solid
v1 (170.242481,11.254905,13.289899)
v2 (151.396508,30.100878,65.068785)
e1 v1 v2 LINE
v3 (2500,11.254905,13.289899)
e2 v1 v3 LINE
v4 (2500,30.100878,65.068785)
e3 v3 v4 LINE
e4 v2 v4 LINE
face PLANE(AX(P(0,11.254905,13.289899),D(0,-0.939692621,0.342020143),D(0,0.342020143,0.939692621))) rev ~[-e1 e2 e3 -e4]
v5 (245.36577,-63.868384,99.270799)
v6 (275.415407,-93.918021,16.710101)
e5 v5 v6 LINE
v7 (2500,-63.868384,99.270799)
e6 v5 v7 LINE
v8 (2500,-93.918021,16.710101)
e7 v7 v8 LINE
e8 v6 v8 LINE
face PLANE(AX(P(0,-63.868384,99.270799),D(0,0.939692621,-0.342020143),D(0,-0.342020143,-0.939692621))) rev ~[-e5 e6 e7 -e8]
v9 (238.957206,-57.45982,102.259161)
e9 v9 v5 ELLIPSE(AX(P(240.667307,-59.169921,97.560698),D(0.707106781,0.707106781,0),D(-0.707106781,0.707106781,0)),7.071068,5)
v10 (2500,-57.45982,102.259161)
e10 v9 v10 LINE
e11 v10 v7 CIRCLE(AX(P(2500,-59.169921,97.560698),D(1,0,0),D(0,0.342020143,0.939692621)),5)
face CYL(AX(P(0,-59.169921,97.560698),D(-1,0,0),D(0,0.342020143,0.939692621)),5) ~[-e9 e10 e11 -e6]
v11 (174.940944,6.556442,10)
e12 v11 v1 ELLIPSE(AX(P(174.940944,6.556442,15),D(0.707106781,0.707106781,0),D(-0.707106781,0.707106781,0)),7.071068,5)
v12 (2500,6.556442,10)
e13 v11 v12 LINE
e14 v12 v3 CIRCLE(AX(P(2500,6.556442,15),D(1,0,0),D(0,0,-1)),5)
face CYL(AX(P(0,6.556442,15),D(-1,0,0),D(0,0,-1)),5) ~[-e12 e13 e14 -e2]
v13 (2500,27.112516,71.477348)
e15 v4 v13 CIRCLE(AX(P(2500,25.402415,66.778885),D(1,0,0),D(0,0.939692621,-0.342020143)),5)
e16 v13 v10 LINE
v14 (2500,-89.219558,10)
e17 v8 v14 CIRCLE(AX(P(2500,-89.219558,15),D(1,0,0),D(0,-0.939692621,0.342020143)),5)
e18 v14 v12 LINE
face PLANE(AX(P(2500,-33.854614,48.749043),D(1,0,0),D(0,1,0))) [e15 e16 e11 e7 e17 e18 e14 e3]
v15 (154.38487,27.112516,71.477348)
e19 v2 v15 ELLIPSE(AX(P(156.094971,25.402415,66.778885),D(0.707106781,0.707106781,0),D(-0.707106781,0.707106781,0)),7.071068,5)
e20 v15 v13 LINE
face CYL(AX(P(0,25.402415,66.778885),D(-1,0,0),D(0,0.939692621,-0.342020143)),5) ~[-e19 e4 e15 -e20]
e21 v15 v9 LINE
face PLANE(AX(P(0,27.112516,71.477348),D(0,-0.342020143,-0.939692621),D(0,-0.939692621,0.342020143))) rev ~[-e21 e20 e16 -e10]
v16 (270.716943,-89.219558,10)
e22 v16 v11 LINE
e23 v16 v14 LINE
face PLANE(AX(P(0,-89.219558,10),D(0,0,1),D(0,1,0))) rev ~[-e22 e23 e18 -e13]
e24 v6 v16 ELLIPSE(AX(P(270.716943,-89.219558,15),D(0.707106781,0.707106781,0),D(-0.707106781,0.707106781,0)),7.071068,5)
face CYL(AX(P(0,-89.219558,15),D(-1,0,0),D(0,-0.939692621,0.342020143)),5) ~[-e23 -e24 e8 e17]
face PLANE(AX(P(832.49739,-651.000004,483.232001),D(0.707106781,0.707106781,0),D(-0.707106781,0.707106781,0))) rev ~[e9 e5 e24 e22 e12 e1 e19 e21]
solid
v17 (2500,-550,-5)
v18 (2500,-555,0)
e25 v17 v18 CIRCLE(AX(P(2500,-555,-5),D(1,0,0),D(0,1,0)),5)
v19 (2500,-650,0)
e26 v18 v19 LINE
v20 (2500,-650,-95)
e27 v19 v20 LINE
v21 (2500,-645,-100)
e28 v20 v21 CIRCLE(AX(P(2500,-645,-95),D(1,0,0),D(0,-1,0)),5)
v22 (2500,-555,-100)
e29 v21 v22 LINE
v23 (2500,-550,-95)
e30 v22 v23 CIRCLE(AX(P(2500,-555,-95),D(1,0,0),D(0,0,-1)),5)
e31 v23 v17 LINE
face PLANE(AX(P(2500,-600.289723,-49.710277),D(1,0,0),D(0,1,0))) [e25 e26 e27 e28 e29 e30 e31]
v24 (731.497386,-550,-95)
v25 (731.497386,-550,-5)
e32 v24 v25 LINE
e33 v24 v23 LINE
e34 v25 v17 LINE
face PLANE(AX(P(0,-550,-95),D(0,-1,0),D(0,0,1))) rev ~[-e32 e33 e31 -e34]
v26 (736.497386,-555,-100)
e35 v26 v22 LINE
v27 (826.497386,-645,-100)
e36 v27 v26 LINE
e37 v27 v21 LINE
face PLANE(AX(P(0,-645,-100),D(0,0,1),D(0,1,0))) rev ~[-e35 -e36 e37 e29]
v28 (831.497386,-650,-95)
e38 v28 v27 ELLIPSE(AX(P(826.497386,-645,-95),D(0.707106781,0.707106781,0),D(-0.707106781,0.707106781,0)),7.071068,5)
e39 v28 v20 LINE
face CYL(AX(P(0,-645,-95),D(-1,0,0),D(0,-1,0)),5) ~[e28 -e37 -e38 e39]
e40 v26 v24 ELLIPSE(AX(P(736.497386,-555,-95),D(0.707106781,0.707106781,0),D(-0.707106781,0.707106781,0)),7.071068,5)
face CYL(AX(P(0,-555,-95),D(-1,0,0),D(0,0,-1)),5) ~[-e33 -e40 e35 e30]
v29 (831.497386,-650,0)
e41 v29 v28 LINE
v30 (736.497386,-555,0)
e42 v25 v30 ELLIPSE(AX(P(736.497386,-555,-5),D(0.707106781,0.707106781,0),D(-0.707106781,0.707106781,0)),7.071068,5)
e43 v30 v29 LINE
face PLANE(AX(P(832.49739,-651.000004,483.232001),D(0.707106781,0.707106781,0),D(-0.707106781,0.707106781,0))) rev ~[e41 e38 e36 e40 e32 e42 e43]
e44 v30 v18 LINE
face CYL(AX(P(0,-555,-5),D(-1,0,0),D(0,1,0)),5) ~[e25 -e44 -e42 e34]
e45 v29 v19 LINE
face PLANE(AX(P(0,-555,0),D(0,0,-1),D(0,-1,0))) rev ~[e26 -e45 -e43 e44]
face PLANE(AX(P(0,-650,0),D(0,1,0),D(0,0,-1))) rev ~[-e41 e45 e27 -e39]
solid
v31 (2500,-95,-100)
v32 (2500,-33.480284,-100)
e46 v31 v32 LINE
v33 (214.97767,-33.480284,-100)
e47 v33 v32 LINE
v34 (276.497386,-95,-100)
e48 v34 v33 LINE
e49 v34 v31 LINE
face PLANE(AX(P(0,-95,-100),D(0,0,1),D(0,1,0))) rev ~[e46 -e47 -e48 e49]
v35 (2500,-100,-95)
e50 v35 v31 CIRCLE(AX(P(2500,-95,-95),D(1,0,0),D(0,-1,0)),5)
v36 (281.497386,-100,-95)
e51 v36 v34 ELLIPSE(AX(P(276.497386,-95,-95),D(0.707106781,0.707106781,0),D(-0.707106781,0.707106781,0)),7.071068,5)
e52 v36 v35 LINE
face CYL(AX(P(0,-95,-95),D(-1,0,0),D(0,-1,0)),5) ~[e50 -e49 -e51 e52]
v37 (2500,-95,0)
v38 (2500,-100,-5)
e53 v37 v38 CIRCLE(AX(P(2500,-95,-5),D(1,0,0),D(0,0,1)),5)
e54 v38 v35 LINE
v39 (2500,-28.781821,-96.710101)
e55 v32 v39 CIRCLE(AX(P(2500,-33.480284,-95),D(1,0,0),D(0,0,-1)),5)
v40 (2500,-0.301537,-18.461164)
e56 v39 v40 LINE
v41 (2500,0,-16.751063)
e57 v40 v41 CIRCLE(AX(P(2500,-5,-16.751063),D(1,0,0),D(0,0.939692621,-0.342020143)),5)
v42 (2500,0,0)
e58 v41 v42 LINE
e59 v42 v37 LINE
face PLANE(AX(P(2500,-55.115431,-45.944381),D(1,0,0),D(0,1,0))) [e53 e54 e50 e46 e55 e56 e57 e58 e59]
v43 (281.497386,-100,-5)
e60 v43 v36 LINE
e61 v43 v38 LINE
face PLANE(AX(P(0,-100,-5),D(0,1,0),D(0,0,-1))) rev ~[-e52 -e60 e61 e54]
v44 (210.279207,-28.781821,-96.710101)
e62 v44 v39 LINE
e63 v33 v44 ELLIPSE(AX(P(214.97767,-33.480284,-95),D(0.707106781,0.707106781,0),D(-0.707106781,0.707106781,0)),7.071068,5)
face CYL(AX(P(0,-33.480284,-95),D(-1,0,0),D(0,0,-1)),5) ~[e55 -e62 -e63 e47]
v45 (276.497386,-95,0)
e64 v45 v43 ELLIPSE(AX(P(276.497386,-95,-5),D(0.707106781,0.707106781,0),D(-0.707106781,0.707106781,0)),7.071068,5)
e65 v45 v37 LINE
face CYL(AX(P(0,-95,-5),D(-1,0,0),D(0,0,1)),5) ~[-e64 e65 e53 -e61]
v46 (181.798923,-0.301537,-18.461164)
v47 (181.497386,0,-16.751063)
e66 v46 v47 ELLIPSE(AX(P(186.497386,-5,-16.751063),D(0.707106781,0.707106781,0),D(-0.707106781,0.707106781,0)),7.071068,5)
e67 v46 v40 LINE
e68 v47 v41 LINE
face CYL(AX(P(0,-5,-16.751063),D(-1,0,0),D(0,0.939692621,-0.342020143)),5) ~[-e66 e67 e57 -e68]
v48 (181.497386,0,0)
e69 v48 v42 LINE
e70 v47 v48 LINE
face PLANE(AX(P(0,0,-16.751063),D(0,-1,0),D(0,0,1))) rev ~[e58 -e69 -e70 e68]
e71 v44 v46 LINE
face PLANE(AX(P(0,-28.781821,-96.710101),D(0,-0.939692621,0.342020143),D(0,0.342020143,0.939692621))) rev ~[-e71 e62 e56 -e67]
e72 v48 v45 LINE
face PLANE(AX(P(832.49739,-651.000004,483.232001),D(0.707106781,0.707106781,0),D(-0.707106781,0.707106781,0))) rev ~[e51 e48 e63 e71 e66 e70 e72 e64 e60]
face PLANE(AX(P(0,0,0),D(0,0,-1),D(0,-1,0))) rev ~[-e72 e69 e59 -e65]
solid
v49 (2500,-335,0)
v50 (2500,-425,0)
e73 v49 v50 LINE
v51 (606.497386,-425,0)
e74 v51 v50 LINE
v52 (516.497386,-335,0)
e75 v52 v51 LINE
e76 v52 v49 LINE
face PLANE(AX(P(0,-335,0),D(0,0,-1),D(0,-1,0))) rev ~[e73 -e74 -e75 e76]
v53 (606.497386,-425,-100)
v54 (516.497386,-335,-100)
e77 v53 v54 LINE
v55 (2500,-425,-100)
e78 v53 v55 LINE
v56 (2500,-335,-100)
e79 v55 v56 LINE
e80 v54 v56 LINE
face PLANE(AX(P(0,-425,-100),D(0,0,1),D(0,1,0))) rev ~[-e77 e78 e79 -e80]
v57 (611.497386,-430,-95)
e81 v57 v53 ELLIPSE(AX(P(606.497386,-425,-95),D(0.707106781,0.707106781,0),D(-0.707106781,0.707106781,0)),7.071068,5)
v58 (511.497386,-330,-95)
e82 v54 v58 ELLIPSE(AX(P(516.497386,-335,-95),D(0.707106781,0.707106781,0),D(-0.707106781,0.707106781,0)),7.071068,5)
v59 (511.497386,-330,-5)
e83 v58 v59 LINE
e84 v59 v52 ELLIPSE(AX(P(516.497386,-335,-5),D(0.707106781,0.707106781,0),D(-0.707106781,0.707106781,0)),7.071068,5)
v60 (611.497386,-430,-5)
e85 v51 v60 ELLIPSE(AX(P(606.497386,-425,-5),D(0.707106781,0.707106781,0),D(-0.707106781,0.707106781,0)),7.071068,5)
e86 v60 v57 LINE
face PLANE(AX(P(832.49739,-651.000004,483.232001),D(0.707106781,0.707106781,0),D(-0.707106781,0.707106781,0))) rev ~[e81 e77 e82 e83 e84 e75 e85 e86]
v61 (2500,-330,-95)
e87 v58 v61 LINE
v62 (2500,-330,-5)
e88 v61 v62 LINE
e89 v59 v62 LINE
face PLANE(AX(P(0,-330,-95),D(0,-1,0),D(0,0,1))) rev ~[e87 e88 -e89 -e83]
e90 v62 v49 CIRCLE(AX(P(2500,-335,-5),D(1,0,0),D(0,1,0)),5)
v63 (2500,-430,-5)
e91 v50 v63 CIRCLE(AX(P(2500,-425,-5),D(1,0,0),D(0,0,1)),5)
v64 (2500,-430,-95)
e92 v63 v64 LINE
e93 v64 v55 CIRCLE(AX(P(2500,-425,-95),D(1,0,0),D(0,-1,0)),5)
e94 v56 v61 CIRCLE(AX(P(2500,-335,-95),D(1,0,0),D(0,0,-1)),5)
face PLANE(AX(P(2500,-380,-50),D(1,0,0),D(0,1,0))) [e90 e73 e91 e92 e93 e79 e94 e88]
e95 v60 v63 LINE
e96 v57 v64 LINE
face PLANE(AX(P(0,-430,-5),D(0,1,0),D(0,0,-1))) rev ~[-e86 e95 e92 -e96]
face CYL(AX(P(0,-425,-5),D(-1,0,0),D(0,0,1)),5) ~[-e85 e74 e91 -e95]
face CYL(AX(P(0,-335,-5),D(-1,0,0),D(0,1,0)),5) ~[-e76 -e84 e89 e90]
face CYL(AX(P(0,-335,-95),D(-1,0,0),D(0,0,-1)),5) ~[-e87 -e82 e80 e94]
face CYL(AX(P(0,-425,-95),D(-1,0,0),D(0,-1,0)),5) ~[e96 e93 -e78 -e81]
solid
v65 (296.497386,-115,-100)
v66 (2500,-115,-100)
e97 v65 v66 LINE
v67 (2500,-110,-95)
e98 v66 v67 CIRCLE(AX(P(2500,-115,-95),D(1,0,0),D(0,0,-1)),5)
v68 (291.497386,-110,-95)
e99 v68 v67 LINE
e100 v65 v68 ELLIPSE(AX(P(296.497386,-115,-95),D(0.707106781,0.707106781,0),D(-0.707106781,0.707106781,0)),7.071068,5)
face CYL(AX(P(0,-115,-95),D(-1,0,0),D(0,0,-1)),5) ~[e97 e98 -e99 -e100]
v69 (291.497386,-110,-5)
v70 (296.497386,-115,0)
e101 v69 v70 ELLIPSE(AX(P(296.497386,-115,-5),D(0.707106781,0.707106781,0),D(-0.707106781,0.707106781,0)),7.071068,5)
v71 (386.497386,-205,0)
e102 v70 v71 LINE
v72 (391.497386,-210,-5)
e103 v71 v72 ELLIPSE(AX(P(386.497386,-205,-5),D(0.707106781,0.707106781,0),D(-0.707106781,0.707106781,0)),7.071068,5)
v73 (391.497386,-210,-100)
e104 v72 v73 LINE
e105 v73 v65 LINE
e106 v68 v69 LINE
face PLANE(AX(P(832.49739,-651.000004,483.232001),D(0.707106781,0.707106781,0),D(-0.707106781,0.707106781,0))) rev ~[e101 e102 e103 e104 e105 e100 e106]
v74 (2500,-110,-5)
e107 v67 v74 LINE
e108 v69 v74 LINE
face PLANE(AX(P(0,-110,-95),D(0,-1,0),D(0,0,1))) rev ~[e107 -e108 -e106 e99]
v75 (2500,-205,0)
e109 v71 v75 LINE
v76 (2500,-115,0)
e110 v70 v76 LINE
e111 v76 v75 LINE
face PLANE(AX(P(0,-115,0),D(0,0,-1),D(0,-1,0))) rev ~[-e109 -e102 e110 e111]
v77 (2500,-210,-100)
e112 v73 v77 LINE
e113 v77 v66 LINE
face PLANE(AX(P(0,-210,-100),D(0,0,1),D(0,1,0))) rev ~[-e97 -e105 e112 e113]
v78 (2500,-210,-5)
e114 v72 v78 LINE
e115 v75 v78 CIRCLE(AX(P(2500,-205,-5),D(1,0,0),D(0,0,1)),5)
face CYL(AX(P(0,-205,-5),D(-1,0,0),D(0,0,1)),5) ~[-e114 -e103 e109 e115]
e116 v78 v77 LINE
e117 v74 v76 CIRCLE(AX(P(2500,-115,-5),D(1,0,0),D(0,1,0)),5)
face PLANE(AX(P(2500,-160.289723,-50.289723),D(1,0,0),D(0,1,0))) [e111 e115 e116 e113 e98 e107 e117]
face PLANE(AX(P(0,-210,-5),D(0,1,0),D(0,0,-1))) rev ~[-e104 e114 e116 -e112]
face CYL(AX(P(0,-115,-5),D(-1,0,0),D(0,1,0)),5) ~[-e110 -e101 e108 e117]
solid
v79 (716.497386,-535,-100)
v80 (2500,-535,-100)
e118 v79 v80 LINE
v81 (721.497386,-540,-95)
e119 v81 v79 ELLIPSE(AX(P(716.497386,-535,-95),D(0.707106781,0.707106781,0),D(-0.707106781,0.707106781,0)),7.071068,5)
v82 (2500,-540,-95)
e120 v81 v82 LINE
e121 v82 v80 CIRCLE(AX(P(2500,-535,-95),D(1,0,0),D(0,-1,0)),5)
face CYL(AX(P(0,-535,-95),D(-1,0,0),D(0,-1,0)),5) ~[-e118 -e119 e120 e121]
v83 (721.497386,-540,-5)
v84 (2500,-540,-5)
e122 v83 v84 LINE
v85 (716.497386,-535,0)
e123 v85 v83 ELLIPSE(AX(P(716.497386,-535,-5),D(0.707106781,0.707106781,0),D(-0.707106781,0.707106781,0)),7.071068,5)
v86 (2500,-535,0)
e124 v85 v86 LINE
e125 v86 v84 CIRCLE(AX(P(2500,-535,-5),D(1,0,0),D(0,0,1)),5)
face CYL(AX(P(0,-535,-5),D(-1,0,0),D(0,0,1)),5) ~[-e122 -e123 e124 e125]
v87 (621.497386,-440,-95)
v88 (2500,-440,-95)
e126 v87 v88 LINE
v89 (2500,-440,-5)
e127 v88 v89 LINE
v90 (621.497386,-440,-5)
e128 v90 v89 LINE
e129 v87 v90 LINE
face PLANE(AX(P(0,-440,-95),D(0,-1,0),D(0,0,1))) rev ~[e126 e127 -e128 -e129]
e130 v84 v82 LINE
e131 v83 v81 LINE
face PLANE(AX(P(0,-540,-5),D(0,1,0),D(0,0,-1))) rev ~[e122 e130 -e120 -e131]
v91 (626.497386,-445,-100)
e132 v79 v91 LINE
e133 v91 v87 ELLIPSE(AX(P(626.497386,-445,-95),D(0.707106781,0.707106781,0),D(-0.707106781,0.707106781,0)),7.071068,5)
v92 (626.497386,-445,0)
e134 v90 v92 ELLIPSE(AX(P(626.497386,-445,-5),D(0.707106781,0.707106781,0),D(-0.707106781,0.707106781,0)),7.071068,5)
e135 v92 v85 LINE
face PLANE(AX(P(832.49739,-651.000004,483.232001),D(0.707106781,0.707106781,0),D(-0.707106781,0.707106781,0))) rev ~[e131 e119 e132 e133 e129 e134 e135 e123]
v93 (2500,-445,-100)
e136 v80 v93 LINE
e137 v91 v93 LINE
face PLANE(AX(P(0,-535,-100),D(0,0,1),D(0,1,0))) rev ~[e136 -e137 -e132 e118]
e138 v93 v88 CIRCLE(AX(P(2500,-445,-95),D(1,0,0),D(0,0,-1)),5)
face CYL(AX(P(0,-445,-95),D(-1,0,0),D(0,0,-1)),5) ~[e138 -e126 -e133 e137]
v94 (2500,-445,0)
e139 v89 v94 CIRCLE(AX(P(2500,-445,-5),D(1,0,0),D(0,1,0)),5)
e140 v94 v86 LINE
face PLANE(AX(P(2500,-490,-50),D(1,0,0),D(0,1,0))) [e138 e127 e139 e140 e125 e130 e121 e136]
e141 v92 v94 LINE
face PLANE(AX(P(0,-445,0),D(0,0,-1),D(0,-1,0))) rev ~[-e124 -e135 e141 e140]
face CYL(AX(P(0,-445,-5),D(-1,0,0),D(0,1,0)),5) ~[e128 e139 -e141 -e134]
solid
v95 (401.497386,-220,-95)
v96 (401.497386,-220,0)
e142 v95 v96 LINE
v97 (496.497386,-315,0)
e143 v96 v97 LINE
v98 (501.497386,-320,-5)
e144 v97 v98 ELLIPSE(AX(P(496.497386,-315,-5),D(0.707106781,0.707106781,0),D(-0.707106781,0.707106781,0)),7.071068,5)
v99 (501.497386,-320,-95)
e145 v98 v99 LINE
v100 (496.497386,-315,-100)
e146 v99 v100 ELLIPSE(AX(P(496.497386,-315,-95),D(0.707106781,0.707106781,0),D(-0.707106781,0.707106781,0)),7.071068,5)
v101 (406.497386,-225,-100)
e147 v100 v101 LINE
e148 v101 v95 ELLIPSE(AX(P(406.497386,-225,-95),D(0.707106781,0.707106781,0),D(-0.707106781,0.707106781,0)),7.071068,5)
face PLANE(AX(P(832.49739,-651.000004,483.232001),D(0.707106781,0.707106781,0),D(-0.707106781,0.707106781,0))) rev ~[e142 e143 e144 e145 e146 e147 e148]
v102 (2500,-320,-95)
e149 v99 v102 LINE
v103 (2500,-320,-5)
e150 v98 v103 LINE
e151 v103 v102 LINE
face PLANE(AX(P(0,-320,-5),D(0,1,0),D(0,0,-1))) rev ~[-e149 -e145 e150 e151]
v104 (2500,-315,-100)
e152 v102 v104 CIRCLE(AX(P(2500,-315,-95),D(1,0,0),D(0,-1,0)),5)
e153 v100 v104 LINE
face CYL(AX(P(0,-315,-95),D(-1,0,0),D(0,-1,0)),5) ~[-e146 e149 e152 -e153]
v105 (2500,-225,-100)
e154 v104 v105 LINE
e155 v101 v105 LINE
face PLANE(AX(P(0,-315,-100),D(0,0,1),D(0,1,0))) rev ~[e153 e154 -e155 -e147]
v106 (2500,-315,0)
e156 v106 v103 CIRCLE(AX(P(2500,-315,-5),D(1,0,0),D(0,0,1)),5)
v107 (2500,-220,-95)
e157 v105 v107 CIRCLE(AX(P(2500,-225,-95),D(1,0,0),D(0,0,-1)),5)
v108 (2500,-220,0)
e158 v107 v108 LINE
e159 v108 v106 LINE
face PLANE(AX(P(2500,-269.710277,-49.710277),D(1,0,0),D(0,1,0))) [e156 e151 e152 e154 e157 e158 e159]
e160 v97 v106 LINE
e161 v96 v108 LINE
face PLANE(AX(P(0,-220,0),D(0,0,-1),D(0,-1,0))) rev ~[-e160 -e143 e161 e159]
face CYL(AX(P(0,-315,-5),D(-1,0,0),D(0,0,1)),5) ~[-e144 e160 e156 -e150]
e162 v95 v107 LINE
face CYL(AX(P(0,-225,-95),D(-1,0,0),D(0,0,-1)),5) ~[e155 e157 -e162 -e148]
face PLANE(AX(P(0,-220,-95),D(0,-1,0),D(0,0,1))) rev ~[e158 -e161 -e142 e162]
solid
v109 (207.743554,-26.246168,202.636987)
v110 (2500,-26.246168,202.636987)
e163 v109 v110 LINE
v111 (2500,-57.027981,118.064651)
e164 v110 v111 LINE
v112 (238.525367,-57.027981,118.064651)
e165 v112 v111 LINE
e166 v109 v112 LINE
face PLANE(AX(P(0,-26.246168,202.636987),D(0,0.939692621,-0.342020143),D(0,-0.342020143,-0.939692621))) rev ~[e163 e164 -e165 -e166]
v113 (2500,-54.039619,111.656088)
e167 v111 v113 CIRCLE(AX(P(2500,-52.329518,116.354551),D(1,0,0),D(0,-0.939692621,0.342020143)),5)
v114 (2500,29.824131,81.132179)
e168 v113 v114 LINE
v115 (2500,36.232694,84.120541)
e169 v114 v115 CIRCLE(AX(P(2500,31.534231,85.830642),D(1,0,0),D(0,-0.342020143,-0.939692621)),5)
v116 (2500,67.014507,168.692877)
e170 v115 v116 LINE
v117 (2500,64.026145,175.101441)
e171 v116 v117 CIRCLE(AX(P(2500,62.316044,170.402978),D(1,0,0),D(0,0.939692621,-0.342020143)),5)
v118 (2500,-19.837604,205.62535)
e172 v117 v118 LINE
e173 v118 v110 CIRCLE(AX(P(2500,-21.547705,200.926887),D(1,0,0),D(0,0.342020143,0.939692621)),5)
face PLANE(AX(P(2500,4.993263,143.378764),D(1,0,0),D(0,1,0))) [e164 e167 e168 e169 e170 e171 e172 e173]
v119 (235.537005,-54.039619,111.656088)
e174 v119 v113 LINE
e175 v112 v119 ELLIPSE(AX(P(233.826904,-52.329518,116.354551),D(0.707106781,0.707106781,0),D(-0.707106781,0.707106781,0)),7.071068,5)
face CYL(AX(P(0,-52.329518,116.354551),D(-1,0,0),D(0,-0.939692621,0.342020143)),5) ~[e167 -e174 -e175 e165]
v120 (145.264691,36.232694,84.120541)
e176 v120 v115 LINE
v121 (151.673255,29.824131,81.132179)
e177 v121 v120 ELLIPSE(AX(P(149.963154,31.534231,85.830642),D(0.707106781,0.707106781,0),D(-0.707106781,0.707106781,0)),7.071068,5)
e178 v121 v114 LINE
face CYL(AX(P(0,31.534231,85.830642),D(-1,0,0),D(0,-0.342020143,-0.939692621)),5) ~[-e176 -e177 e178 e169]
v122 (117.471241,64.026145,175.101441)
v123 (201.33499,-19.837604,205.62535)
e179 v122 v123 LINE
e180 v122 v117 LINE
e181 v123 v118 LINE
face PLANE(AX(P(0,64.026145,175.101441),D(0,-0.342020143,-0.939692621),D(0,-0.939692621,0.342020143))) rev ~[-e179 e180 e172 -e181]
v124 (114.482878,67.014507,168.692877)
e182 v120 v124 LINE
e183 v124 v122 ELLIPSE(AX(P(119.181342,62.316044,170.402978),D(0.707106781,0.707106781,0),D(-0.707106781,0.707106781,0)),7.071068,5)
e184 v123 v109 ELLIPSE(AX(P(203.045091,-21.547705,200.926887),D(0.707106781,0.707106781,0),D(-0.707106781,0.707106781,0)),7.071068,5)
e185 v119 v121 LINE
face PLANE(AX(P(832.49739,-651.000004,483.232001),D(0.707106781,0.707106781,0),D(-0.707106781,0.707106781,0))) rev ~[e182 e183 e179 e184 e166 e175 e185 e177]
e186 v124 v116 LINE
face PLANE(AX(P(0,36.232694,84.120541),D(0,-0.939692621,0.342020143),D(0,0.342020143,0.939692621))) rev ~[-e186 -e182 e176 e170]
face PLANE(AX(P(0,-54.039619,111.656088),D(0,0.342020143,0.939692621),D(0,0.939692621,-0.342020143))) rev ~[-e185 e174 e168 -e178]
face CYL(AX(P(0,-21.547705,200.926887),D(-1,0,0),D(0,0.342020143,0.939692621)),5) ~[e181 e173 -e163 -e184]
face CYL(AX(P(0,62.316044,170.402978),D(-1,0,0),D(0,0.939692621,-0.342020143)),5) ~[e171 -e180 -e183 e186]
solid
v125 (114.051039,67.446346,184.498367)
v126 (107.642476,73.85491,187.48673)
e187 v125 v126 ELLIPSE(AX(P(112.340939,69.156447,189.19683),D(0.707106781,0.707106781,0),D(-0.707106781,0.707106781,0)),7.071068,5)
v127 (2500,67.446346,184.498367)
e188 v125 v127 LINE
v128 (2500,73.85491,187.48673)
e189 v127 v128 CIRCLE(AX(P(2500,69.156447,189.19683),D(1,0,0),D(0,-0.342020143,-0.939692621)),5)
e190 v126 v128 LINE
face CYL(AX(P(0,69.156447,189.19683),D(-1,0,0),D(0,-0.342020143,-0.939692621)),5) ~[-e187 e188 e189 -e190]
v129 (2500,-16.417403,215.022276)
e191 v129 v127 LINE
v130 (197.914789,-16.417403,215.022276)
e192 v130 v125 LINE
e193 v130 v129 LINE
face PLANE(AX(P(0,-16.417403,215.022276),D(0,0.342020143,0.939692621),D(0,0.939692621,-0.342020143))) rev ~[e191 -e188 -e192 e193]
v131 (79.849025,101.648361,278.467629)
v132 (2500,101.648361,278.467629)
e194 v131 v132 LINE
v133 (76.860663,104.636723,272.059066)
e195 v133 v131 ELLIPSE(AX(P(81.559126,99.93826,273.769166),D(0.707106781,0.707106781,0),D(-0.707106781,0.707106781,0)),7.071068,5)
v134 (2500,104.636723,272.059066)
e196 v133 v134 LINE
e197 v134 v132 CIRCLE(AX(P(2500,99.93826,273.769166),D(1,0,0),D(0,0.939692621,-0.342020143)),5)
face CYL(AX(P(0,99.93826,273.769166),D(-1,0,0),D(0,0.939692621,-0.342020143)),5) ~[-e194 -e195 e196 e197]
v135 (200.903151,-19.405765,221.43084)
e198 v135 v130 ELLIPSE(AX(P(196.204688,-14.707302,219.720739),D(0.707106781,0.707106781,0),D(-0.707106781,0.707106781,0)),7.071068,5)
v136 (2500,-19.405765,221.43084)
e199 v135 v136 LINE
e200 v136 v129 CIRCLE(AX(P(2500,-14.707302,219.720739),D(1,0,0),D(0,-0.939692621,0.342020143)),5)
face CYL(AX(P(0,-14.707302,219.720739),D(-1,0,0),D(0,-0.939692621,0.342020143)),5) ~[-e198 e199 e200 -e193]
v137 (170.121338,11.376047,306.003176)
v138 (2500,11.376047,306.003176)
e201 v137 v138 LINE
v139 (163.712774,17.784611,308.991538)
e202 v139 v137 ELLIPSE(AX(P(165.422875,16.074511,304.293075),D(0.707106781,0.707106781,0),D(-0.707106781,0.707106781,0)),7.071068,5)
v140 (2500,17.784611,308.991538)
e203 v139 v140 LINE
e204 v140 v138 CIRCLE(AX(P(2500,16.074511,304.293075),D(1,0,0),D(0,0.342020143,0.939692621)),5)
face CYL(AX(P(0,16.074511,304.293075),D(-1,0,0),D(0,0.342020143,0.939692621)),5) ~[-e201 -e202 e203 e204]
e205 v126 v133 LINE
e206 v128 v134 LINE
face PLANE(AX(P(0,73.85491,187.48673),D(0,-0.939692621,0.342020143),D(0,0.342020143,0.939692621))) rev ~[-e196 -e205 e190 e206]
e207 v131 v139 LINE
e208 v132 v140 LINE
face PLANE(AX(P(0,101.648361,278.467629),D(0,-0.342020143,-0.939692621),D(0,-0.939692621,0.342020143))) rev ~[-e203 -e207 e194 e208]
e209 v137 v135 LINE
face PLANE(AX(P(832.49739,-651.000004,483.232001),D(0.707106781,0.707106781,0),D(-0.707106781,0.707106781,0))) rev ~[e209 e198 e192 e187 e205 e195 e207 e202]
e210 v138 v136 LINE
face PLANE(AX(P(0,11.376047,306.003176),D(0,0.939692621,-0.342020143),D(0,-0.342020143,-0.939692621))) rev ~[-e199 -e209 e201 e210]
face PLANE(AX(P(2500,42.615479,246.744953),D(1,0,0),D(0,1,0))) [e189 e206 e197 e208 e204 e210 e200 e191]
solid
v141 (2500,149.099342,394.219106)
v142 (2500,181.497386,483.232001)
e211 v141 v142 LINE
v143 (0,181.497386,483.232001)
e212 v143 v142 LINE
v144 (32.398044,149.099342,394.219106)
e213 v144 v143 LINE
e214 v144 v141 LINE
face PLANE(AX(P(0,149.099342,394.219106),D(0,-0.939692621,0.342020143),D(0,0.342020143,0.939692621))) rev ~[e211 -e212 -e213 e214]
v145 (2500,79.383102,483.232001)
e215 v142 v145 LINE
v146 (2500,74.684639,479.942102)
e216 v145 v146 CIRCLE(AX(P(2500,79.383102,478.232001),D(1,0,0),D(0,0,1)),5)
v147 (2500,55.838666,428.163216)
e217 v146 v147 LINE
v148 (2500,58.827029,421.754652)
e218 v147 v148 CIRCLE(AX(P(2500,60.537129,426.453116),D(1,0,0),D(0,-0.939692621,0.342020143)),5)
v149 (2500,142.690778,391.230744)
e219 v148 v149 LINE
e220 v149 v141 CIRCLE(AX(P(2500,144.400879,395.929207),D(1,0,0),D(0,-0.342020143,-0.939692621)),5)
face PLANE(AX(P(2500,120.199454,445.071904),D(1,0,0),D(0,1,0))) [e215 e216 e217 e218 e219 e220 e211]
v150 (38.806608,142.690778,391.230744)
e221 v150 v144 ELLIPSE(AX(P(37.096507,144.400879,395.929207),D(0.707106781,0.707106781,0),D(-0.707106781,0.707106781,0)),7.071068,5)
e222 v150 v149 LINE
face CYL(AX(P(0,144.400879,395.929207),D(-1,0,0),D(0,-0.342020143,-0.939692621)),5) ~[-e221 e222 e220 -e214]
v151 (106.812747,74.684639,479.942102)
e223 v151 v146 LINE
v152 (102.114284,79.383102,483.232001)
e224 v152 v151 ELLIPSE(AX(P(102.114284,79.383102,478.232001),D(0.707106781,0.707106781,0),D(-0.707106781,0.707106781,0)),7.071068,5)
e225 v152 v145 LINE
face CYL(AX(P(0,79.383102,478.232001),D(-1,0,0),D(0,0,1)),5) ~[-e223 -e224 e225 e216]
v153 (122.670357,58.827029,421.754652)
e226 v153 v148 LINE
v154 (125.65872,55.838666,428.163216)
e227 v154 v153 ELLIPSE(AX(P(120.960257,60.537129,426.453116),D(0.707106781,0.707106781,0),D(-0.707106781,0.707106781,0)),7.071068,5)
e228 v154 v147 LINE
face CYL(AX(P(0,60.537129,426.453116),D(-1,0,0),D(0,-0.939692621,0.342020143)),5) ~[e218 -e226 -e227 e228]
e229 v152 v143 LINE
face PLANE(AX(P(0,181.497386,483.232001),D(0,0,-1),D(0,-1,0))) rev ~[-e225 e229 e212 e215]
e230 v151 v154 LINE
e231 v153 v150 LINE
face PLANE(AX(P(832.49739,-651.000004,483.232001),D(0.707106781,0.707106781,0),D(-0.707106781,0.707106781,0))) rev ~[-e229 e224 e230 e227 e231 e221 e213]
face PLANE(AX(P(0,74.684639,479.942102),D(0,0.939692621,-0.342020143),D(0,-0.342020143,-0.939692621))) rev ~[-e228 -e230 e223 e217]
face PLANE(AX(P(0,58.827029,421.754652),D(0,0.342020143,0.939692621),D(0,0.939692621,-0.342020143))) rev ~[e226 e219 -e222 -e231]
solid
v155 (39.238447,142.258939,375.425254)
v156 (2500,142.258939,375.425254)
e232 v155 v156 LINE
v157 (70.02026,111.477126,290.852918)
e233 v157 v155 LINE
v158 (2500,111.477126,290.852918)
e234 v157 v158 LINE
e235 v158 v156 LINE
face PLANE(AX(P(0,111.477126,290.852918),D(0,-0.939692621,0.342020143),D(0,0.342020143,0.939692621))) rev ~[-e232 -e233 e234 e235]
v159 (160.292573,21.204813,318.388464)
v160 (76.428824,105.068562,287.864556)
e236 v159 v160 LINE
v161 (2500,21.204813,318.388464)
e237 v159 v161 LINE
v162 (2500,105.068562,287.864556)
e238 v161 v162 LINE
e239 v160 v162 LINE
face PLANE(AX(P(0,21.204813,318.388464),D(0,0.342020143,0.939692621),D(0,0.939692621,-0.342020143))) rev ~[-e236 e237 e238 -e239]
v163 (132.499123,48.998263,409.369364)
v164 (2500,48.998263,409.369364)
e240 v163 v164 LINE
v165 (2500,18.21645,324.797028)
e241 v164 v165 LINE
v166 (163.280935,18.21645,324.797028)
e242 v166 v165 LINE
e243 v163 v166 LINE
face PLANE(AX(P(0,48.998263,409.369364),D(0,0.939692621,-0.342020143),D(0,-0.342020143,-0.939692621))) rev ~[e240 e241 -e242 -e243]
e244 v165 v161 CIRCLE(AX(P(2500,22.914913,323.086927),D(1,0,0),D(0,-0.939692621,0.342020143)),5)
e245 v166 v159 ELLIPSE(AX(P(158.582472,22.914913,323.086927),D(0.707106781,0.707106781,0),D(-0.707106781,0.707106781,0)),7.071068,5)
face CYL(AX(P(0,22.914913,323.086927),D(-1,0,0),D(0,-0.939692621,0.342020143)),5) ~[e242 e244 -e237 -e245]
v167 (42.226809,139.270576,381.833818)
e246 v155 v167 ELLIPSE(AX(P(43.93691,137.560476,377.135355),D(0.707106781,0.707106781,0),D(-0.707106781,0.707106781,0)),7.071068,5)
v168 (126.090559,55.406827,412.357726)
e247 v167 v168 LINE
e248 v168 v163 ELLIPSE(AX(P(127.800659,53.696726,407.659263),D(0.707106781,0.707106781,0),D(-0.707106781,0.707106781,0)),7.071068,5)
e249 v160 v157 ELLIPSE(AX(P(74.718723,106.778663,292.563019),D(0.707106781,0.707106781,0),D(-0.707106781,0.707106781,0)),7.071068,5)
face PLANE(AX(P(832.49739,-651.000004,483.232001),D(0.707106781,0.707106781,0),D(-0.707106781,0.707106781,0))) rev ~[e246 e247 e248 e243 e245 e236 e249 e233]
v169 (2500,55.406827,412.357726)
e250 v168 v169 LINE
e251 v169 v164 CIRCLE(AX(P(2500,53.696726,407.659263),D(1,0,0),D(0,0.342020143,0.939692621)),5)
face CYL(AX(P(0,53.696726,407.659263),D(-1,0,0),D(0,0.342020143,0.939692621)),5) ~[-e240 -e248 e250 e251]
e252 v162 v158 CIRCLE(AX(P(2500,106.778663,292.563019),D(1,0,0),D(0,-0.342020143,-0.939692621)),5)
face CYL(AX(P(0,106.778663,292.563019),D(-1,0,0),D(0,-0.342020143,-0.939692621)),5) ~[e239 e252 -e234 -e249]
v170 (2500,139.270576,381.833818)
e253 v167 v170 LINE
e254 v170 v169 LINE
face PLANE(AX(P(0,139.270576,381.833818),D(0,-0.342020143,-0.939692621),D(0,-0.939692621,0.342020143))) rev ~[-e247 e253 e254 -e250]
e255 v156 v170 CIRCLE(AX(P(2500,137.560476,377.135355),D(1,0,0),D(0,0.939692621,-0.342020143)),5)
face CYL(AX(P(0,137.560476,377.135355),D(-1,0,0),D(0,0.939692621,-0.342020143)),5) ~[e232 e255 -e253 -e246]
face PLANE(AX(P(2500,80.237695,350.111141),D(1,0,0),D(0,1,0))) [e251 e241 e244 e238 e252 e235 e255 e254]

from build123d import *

# Parameters (mm, degrees)
F1_DEPTH = 2500
F3_DEPTH = 583.2330008918


# Not quite as in the source:
# - a feature names something its author has since deleted; it is built from what else it names


with BuildPart() as f1:
    # F0 (on Right) → F1 (new body)
    with BuildSketch(Plane.YZ):
        with BuildLine():
            Line((0, -16.7510631673), (0, 0))
            Line((0, 0), (-95, 0))
            ThreePointArc((-95, 0), (-98.5355339059, -1.4644660941), (-100, -5))
            Line((-100, -5), (-100, -95))
            ThreePointArc((-100, -95), (-98.5355339059, -98.5355339059), (-95, -100))
            Line((-95, -100), (-33.4802838701, -100))
            ThreePointArc((-33.4802838701, -100), (-30.6124016883, -99.0957602214), (-28.7818207661, -96.7101007166))
            Line((-28.7818207661, -96.7101007166), (-0.3015368961, -18.4611638839))
            ThreePointArc((-0.3015368961, -18.4611638839), (-0.0759612349, -17.6193040556), (0, -16.7510631673))
        make_face()
    extrude(amount=F1_DEPTH)


with BuildPart() as f1b:
    # F0 (on Right) → F1, piece 2 (new body)
    with BuildSketch(Plane.YZ):
        with BuildLine():
            ThreePointArc((-110, -5), (-111.4644660941, -1.4644660941), (-115, 0))
            Line((-115, 0), (-205, 0))
            ThreePointArc((-205, 0), (-208.5355339059, -1.4644660941), (-210, -5))
            Line((-210, -5), (-210, -100))
            Line((-210, -100), (-115, -100))
            ThreePointArc((-115, -100), (-111.4644660941, -98.5355339059), (-110, -95))
            Line((-110, -95), (-110, -5))
        make_face()
    extrude(amount=F1_DEPTH)


with BuildPart() as f1c:
    # F0 (on Right) → F1, piece 3 (new body)
    with BuildSketch(Plane.YZ):
        with BuildLine():
            Line((-220, -95), (-220, 0))
            Line((-220, 0), (-315, 0))
            ThreePointArc((-315, 0), (-318.5355339059, -1.4644660941), (-320, -5))
            Line((-320, -5), (-320, -95))
            ThreePointArc((-320, -95), (-318.5355339059, -98.5355339059), (-315, -100))
            Line((-315, -100), (-225, -100))
            ThreePointArc((-225, -100), (-221.4644660941, -98.5355339059), (-220, -95))
        make_face()
    extrude(amount=F1_DEPTH)


with BuildPart() as f1d:
    # F0 (on Right) → F1, piece 4 (new body)
    with BuildSketch(Plane.YZ):
        with BuildLine():
            ThreePointArc((-330, -5), (-331.4644660941, -1.4644660941), (-335, 0))
            Line((-335, 0), (-425, 0))
            ThreePointArc((-425, 0), (-428.5355339059, -1.4644660941), (-430, -5))
            Line((-430, -5), (-430, -95))
            ThreePointArc((-430, -95), (-428.5355339059, -98.5355339059), (-425, -100))
            Line((-425, -100), (-335, -100))
            ThreePointArc((-335, -100), (-331.4644660941, -98.5355339059), (-330, -95))
            Line((-330, -95), (-330, -5))
        make_face()
    extrude(amount=F1_DEPTH)


with BuildPart() as f1e:
    # F0 (on Right) → F1, piece 5 (new body)
    with BuildSketch(Plane.YZ):
        with BuildLine():
            ThreePointArc((-440, -5), (-441.4644660941, -1.4644660941), (-445, 0))
            Line((-445, 0), (-535, 0))
            ThreePointArc((-535, 0), (-538.5355339059, -1.4644660941), (-540, -5))
            Line((-540, -5), (-540, -95))
            ThreePointArc((-540, -95), (-538.5355339059, -98.5355339059), (-535, -100))
            Line((-535, -100), (-445, -100))
            ThreePointArc((-445, -100), (-441.4644660941, -98.5355339059), (-440, -95))
            Line((-440, -95), (-440, -5))
        make_face()
    extrude(amount=F1_DEPTH)


with BuildPart() as f1f:
    # F0 (on Right) → F1, piece 6 (new body)
    with BuildSketch(Plane.YZ):
        with BuildLine():
            ThreePointArc((-550, -5), (-551.4644660941, -1.4644660941), (-555, 0))
            Line((-555, 0), (-650, 0))
            Line((-650, 0), (-650, -95))
            ThreePointArc((-650, -95), (-648.5355339059, -98.5355339059), (-645, -100))
            Line((-645, -100), (-555, -100))
            ThreePointArc((-555, -100), (-551.4644660941, -98.5355339059), (-550, -95))
            Line((-550, -95), (-550, -5))
        make_face()
    extrude(amount=F1_DEPTH)


with BuildPart() as f1g:
    # F0 (on Right) → F1, piece 7 (new body)
    with BuildSketch(Plane.YZ):
        with BuildLine():
            Line((-63.8683840414, 99.2707989747), (-93.9180207276, 16.7101007166))
            ThreePointArc((-93.9180207276, 16.7101007166), (-93.3153178451, 12.1321178182), (-89.2195576236, 10))
            Line((-89.2195576236, 10), (6.5564418992, 10))
            ThreePointArc((6.5564418992, 10), (9.424324081, 10.9042397786), (11.2549050031, 13.2898992834))
            Line((11.2549050031, 13.2898992834), (30.1008780372, 65.0687846421))
            ThreePointArc((30.1008780372, 65.0687846421), (29.9339538684, 68.8919766674), (27.1125156499, 71.4773484627))
            Line((27.1125156499, 71.4773484627), (-57.4598202208, 102.259161362))
            ThreePointArc((-57.4598202208, 102.259161362), (-61.2830122462, 102.0922371932), (-63.8683840414, 99.2707989747))
        make_face()
    extrude(amount=F1_DEPTH)


with BuildPart() as f1h:
    # F0 (on Right) → F1, piece 8 (new body)
    with BuildSketch(Plane.YZ):
        with BuildLine():
            ThreePointArc((-57.0279811749, 118.0646513904), (-56.8610570061, 114.241459365), (-54.0396187876, 111.6560875698))
            Line((-54.0396187876, 111.6560875698), (29.8241305782, 81.1321790667))
            ThreePointArc((29.8241305782, 81.1321790667), (33.6473226035, 81.2991032355), (36.2326943987, 84.120541454))
            Line((36.2326943987, 84.120541454), (67.014507298, 168.6928773248))
            ThreePointArc((67.014507298, 168.6928773248), (66.8475831293, 172.5160693501), (64.0261449107, 175.1014411453))
            Line((64.0261449107, 175.1014411453), (-19.837604455, 205.6253496484))
            ThreePointArc((-19.837604455, 205.6253496484), (-23.6607964803, 205.4584254797), (-26.2461682756, 202.6369872611))
            Line((-26.2461682756, 202.6369872611), (-57.0279811749, 118.0646513904))
        make_face()
    extrude(amount=F1_DEPTH)


with BuildPart() as f1i:
    # F0 (on Right) → F1, piece 9 (new body)
    with BuildSketch(Plane.YZ):
        with BuildLine():
            Line((11.3760474902, 306.0031755476), (-19.4057654091, 221.4308396768))
            ThreePointArc((-19.4057654091, 221.4308396768), (-19.2388412403, 217.6076476515), (-16.4174030218, 215.0222758563))
            Line((-16.4174030218, 215.0222758563), (67.446346344, 184.4983673532))
            ThreePointArc((67.446346344, 184.4983673532), (71.2695383693, 184.6652915219), (73.8549101645, 187.4867297405))
            Line((73.8549101645, 187.4867297405), (104.6367230638, 272.0590656112))
            ThreePointArc((104.6367230638, 272.0590656112), (104.4697988951, 275.8822576365), (101.6483606765, 278.4676294318))
            Line((101.6483606765, 278.4676294318), (17.7846113108, 308.9915379349))
            ThreePointArc((17.7846113108, 308.9915379349), (13.9614192855, 308.8246137661), (11.3760474902, 306.0031755476))
        make_face()
    extrude(amount=F1_DEPTH)


with BuildPart() as f1j:
    # F0 (on Right) → F1, piece 10 (new body)
    with BuildSketch(Plane.YZ):
        with BuildLine():
            Line((149.0993416962, 394.2191063134), (181.4973857886, 483.2320008918))
            Line((181.4973857886, 483.2320008918), (79.3831022606, 483.2320008918))
            ThreePointArc((79.3831022606, 483.2320008918), (76.5152200788, 482.3277611133), (74.6846391566, 479.9421016085))
            Line((74.6846391566, 479.9421016085), (55.8386661226, 428.1632162497))
            ThreePointArc((55.8386661226, 428.1632162497), (56.0055902913, 424.3400242244), (58.8270285099, 421.7546524292))
            Line((58.8270285099, 421.7546524292), (142.6907778756, 391.2307439261))
            ThreePointArc((142.6907778756, 391.2307439261), (146.513969901, 391.3976680948), (149.0993416962, 394.2191063134))
        make_face()
    extrude(amount=F1_DEPTH)


with BuildPart() as f1k:
    # F0 (on Right) → F1, piece 11 (new body)
    with BuildSketch(Plane.YZ):
        with BuildLine():
            ThreePointArc((18.2164503568, 324.7970279633), (18.3833745255, 320.9738359379), (21.2048127441, 318.3884641427))
            Line((21.2048127441, 318.3884641427), (105.0685621098, 287.8645556396))
            ThreePointArc((105.0685621098, 287.8645556396), (108.8917541351, 288.0314798084), (111.4771259304, 290.8529180269))
            Line((111.4771259304, 290.8529180269), (142.2589388297, 375.4252538977))
            ThreePointArc((142.2589388297, 375.4252538977), (142.0920146609, 379.248445923), (139.2705764424, 381.8338177182))
            Line((139.2705764424, 381.8338177182), (55.4068270766, 412.3577262213))
            ThreePointArc((55.4068270766, 412.3577262213), (51.5836350513, 412.1908020526), (48.9982632561, 409.369363834))
            Line((48.9982632561, 409.369363834), (18.2164503568, 324.7970279633))
        make_face()
    extrude(amount=F1_DEPTH)


with BuildPart() as f3_tool:
    # F2 (on face) → F3 (new body, through all)
    with BuildSketch(Plane.XY.offset(483.2320008918)):
        Polygon((0, 181.4973857886), (0, 79.3831022606), (102.114283528, 79.3831022606), align=None)
        Polygon((0, 79.3831022606), (0, -651.0000042114), (832.49739, -651.0000042114), (102.114283528, 79.3831022606), align=None)
    extrude(amount=-F3_DEPTH)


with BuildPart() as f1_1:
    add(f1.part)

    # F3: cut by f3_tool
    add(f3_tool.part, mode=Mode.SUBTRACT)


with BuildPart() as f1b_1:
    add(f1b.part)

    # F3: cut by f3_tool
    add(f3_tool.part, mode=Mode.SUBTRACT)


with BuildPart() as f1c_1:
    add(f1c.part)

    # F3: cut by f3_tool
    add(f3_tool.part, mode=Mode.SUBTRACT)


with BuildPart() as f1d_1:
    add(f1d.part)

    # F3: cut by f3_tool
    add(f3_tool.part, mode=Mode.SUBTRACT)


with BuildPart() as f1e_1:
    add(f1e.part)

    # F3: cut by f3_tool
    add(f3_tool.part, mode=Mode.SUBTRACT)


with BuildPart() as f1f_1:
    add(f1f.part)

    # F3: cut by f3_tool
    add(f3_tool.part, mode=Mode.SUBTRACT)


with BuildPart() as f1g_1:
    add(f1g.part)

    # F3: cut by f3_tool
    add(f3_tool.part, mode=Mode.SUBTRACT)


with BuildPart() as f1h_1:
    add(f1h.part)

    # F3: cut by f3_tool
    add(f3_tool.part, mode=Mode.SUBTRACT)


with BuildPart() as f1i_1:
    add(f1i.part)

    # F3: cut by f3_tool
    add(f3_tool.part, mode=Mode.SUBTRACT)


with BuildPart() as f1j_1:
    add(f1j.part)

    # F3: cut by f3_tool
    add(f3_tool.part, mode=Mode.SUBTRACT)


with BuildPart() as f1k_1:
    add(f1k.part)

    # F3: cut by f3_tool
    add(f3_tool.part, mode=Mode.SUBTRACT)


solid = Compound([f1_1.part, f1b_1.part, f1c_1.part, f1d_1.part, f1e_1.part, f1f_1.part, f1g_1.part, f1h_1.part, f1i_1.part, f1j_1.part, f1k_1.part])
